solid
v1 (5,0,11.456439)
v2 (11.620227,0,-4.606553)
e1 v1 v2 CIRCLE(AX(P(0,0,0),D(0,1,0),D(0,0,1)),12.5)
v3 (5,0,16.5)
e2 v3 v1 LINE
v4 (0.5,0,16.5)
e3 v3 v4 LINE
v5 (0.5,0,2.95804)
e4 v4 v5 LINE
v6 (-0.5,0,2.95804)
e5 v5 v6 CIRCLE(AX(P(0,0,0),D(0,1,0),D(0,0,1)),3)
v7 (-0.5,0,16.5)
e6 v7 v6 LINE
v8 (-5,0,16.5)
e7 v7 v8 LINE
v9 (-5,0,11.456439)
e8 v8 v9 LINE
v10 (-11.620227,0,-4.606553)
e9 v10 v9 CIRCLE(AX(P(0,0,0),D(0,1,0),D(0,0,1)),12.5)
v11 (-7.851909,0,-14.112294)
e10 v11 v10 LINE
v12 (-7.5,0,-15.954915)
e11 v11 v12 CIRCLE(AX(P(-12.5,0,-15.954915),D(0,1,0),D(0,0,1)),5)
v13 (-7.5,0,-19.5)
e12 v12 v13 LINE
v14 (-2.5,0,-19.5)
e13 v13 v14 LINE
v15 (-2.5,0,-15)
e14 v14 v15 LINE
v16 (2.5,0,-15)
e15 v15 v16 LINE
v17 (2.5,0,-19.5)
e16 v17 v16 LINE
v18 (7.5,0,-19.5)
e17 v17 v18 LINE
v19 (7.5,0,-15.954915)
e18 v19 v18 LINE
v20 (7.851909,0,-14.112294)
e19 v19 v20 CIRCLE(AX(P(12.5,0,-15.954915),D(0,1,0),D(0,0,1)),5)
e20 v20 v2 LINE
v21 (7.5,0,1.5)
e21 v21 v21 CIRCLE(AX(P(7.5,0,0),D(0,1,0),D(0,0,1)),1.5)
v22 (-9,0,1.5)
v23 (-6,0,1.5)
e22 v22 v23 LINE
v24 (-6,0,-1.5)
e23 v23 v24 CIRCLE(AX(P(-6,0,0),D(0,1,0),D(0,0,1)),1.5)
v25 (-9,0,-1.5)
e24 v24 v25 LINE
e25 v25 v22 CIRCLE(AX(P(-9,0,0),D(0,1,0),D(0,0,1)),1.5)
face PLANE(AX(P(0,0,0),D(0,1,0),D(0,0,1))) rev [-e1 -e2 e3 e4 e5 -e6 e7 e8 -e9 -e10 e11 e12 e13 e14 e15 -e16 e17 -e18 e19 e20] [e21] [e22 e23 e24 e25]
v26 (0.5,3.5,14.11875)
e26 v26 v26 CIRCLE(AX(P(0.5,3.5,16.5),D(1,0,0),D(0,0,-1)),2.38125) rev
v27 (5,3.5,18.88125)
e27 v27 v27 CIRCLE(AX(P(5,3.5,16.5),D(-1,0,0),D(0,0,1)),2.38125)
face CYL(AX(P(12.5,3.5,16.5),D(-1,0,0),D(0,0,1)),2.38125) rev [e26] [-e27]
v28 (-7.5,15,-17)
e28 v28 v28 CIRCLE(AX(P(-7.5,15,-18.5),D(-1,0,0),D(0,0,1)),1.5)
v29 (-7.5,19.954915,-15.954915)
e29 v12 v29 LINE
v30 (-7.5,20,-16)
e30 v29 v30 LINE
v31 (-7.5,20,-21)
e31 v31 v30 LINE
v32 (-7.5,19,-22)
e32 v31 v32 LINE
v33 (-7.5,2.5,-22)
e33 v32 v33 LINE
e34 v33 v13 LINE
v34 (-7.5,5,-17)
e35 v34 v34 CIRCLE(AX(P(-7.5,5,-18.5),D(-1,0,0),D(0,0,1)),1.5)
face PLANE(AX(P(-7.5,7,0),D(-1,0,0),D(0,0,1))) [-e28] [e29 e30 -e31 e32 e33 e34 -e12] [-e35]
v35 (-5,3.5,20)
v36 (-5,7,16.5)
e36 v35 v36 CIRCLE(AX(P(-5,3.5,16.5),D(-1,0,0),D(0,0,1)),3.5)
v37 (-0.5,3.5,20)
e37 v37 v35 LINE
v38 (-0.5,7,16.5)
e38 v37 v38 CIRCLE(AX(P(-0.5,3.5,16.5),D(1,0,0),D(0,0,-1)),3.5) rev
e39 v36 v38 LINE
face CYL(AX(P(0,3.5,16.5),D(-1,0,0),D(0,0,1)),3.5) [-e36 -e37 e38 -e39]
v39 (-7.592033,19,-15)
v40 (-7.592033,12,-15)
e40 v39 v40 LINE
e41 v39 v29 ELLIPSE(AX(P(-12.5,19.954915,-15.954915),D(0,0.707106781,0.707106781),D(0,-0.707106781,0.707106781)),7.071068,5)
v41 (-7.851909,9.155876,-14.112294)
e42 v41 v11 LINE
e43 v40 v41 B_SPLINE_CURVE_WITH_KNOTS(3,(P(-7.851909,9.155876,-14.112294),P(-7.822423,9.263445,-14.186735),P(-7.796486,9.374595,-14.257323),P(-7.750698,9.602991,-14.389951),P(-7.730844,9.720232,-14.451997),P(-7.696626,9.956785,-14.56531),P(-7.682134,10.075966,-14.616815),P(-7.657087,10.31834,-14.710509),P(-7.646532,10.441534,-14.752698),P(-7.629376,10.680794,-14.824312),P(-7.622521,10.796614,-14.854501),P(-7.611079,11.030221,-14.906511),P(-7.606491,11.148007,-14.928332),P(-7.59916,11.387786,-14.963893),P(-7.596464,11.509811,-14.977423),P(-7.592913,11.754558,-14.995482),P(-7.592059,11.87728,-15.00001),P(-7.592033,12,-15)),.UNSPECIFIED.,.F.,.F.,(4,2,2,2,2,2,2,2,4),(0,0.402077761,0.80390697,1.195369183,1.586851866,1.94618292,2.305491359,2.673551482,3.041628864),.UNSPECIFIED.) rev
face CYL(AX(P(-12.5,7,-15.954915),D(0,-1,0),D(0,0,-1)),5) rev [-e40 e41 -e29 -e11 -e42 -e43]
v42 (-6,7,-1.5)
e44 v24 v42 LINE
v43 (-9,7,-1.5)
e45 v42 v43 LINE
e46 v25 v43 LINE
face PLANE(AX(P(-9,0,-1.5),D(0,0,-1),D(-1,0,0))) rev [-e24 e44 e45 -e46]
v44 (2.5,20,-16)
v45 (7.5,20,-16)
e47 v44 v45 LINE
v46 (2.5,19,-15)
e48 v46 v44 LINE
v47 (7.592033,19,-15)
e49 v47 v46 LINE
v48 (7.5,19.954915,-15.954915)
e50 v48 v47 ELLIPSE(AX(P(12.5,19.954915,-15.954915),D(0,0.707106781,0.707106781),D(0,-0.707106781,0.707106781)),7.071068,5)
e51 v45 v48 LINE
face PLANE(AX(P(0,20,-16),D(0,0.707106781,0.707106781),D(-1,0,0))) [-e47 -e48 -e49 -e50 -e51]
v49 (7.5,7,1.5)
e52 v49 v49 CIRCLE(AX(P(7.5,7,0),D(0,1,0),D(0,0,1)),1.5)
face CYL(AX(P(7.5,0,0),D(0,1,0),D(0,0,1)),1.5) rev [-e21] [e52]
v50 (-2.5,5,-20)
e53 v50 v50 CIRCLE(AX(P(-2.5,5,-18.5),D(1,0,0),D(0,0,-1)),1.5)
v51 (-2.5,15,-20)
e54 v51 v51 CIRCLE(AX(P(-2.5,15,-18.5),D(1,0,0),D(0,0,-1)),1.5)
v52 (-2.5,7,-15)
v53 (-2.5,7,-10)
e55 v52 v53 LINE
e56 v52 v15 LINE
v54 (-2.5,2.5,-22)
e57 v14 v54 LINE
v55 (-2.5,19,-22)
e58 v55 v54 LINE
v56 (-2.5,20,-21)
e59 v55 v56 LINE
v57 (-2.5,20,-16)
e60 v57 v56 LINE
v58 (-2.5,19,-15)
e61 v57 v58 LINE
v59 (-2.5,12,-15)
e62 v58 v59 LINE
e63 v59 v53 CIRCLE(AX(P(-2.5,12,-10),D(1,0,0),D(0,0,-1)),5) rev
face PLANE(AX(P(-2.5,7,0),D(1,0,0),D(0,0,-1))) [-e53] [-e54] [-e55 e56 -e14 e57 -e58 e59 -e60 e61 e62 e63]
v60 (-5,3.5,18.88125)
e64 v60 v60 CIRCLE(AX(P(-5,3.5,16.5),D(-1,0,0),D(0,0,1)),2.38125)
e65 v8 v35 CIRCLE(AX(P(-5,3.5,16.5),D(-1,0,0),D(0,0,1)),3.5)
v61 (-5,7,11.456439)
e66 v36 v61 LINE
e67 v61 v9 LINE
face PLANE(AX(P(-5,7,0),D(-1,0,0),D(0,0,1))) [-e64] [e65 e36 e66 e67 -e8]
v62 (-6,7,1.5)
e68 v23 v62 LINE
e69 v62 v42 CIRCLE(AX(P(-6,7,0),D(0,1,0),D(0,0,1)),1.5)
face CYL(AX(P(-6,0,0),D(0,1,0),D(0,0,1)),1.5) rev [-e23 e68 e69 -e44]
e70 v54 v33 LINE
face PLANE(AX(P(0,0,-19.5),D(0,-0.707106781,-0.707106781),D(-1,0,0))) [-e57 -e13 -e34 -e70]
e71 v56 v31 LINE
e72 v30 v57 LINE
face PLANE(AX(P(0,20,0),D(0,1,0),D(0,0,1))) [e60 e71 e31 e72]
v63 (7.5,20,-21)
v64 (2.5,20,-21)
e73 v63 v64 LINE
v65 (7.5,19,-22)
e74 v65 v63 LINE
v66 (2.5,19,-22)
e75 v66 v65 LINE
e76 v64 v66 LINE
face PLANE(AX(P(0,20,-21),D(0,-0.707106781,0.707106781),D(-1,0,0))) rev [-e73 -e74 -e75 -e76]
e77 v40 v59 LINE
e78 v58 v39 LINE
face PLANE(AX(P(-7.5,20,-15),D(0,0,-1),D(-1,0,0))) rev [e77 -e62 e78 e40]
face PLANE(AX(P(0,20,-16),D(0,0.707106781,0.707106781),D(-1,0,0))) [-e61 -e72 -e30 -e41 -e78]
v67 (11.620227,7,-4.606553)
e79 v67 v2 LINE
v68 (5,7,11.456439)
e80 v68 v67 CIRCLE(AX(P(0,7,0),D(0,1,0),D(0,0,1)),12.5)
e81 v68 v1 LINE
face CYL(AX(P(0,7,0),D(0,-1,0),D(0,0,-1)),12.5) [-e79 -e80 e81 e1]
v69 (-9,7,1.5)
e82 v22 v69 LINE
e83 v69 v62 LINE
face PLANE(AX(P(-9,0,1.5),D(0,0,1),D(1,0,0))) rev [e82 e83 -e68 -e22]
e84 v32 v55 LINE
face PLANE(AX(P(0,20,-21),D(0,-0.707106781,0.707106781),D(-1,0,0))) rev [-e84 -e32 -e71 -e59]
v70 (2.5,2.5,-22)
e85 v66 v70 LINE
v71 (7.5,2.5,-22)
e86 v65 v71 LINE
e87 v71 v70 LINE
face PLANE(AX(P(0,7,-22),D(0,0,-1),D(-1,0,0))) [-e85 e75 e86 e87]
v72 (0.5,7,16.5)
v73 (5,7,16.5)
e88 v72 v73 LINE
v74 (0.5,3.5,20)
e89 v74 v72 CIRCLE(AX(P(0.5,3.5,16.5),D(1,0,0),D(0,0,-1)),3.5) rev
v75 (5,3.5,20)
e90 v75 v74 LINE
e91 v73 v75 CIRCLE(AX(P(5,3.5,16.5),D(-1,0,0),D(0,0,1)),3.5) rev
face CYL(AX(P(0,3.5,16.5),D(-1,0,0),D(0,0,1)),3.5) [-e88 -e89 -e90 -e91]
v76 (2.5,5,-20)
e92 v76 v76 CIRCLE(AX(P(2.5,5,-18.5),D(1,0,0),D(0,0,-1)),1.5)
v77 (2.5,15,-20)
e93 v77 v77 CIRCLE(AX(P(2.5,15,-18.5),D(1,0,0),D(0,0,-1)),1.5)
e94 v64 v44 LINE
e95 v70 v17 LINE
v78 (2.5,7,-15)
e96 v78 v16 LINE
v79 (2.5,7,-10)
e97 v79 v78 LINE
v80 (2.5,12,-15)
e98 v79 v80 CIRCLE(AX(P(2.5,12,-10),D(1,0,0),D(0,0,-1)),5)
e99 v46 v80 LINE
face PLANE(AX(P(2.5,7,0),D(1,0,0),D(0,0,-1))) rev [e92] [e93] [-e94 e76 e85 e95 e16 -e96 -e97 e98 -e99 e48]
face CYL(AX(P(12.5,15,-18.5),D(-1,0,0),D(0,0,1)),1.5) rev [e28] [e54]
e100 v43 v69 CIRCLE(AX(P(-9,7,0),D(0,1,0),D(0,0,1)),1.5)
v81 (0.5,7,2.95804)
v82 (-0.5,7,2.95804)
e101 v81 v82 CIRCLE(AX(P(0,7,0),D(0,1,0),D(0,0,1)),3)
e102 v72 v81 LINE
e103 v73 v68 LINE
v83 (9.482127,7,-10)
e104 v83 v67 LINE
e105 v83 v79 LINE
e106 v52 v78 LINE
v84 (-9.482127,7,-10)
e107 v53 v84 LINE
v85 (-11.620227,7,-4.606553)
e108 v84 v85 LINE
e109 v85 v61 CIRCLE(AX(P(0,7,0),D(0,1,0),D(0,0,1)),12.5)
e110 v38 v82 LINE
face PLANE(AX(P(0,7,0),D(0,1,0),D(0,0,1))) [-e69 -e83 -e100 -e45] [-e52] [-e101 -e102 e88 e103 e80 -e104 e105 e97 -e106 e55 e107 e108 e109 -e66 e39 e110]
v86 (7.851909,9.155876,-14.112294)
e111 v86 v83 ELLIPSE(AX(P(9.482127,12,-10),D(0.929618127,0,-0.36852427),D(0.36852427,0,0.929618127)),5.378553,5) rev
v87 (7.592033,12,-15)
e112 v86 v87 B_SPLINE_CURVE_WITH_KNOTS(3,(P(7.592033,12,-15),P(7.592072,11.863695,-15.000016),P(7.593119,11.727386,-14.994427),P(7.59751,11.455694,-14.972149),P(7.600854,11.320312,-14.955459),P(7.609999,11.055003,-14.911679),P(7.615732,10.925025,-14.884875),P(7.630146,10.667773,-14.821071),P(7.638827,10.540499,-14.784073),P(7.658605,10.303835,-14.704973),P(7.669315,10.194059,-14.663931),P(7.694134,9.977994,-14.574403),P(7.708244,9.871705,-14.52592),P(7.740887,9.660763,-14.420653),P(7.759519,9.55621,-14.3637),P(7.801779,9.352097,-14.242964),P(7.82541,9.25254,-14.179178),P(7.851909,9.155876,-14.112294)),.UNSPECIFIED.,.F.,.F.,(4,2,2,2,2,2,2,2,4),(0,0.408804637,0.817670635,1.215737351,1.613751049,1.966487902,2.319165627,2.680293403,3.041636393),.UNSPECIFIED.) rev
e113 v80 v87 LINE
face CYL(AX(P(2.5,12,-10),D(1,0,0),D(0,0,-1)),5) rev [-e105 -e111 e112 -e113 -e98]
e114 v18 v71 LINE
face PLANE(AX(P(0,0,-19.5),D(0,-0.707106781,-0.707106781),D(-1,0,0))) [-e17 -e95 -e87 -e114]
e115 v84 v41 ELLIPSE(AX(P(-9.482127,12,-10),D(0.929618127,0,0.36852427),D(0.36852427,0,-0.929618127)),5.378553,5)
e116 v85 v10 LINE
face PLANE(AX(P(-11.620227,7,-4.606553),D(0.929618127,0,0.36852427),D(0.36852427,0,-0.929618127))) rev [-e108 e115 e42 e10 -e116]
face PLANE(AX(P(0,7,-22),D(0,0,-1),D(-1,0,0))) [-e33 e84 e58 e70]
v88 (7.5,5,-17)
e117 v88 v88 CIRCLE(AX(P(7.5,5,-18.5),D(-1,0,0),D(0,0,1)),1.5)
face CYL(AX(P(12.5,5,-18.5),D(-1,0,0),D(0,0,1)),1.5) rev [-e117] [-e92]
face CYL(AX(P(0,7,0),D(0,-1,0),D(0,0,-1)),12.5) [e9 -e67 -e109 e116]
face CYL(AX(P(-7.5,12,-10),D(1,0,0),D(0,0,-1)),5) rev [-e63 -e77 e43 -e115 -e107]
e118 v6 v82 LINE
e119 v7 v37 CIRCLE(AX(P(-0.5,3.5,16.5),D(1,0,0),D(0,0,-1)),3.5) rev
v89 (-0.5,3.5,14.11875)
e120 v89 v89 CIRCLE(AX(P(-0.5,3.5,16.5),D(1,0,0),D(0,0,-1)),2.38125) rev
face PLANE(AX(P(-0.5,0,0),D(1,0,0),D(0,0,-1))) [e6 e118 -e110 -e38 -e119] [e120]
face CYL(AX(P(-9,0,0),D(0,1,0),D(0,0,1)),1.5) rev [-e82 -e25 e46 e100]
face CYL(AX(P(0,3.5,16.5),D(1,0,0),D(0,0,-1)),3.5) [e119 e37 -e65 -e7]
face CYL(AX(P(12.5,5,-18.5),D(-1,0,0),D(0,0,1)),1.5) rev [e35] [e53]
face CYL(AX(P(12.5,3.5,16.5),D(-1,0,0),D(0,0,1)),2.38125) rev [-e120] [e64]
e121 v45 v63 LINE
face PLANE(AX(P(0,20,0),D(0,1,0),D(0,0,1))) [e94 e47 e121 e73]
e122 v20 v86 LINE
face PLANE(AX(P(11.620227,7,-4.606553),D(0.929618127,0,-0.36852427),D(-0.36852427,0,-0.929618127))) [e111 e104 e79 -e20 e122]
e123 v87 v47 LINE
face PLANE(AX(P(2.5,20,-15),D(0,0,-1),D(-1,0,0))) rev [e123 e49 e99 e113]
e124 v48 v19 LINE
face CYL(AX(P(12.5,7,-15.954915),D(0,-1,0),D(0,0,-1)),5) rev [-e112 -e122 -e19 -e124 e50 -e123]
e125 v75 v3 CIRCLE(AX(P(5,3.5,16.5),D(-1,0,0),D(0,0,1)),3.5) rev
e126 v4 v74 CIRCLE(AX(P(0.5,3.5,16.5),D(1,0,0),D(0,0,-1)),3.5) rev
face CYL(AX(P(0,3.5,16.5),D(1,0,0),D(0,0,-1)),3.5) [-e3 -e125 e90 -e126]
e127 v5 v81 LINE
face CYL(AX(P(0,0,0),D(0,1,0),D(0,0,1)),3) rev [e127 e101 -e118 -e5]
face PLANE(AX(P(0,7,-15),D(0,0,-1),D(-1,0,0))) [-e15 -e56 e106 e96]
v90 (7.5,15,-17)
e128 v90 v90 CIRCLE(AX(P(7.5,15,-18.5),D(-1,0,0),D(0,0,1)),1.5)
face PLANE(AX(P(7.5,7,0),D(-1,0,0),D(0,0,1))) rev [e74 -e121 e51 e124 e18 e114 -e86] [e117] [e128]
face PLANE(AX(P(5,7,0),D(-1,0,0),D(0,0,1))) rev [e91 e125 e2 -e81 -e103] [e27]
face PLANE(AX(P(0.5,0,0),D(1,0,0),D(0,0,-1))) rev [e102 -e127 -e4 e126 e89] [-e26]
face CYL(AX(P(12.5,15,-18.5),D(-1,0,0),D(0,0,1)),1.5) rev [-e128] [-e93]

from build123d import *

# Parameters (mm, degrees)
SKETCH1_W           = 5
SKETCH1_H           = 7
BOSS_EXTRUDE1_DEPTH = 7
SKETCH3_R           = 2.38125
CUT_EXTRUDE2_DEPTH  = 29.969811874
FILLET2_R           = 3.5
SKETCH5_W           = 1
SKETCH5_H           = 8.5
CUT_EXTRUDE4_DEPTH  = 27.253571186
SKETCH6_R           = 1.5
CUT_EXTRUDE5_DEPTH  = 27.253571186
SKETCH8_W           = 5
SKETCH8_H           = 7
BOSS_EXTRUDE2_DEPTH = 13
FILLET3_DEPTH       = 20
FILLET3_2_DEPTH     = 8.22694
FILLET3_START       = -9.48212727
FILLET3_3_DEPTH     = 6.98212727
FILLET3_START_2     = 2.5
FILLET3_4_DEPTH     = 6.98212727
FILLET3_START_3     = 7
FILLET3_5_DEPTH     = 13.0000001
CHAMFER1_SIZE       = 2.5
CHAMFER2_SIZE       = 1
SKETCH9_R           = 1.5
CUT_EXTRUDE7_DEPTH  = 36.832945734


with BuildPart() as part:
    # Sketch1 → Boss-Extrude1 (new body)
    with BuildSketch(Plane(origin=(0, 0, 0), x_dir=(1, 0, 0), z_dir=(0, 1, 0))):
        with BuildLine():
            Line((-5, -5), (-5, -11.456439237))
            ThreePointArc((-5, -11.456439237), (0, -12.5), (5, -11.456439237))
            Line((5, -11.456439237), (5, -5))
            Line((5, -5), (-5, -5))
        make_face()
        with BuildLine():
            ThreePointArc((-11.620226592, 4.606553371), (-11.556942324, -4.763096065), (-5, -11.456439237))
            Line((-5, -11.456439237), (-5, -5))
            Line((-5, -5), (5, -5))
            Line((5, -5), (5, -11.456439237))
            ThreePointArc((5, -11.456439237), (10.458250332, -6.846531969), (12.5, 0))
            ThreePointArc((12.5, 0), (12.27808683, 2.344905926), (11.620226592, 4.606553371))
            ThreePointArc((11.620226592, 4.606553371), (0, 12.5), (-11.620226592, 4.606553371))
        make_face()
        with BuildLine():
            Line((-5, -11.456439237), (-5, -20))
            Line((-5, -20), (5, -20))
            Line((5, -20), (5, -11.456439237))
            ThreePointArc((5, -11.456439237), (0, -12.5), (-5, -11.456439237))
        make_face()
        with BuildLine():
            Line((-7.5, 15), (-11.620226592, 4.606553371))
            ThreePointArc((-11.620226592, 4.606553371), (0, 12.5), (11.620226592, 4.606553371))
            Line((11.620226592, 4.606553371), (7.5, 15))
            Line((7.5, 15), (2.5, 15))
            Line((2.5, 15), (-2.5, 15))
            Line((-2.5, 15), (-7.5, 15))
        make_face()
        with Locations((-5, 18.5)):
            Rectangle(SKETCH1_W, SKETCH1_H)
        with Locations((5, 18.5)):
            Rectangle(SKETCH1_W, SKETCH1_H)
    extrude(amount=BOSS_EXTRUDE1_DEPTH)

    # Sketch3 → Cut-Extrude2 (cut, through all)
    with BuildSketch(Plane.ZY.offset(5)):
        with Locations((16.5, 3.5)):
            Circle(SKETCH3_R)
    extrude(amount=-CUT_EXTRUDE2_DEPTH, mode=Mode.SUBTRACT)

    # Fillet2
    fillet2_edges = [part.edges().sort_by_distance(p)[0] for p in [
        (0, 0, 20),
        (0, 7, 20),
    ]]
    fillet(fillet2_edges, radius=FILLET2_R - 0.0001)  # a hair under: the kernel refuses the full size

    # Sketch5 → Cut-Extrude4 (cut, through all)
    with BuildSketch(Plane(origin=(0, 7, 0), x_dir=(1, 0, 0), z_dir=(0, 1, 0))):
        with BuildLine():
            ThreePointArc((3, 0), (-1.936491673, 2.291287847), (-0.5, -2.958039892))
            Line((-0.5, -2.958039892), (-0.5, 0))
            Line((-0.5, 0), (0.5, 0))
            Line((0.5, 0), (0.5, -2.958039892))
            ThreePointArc((0.5, -2.958039892), (2.291287847, -1.936491673), (3, 0))
        make_face()
        with BuildLine():
            Line((-0.5, 0), (-0.5, -2.958039892))
            ThreePointArc((-0.5, -2.958039892), (0, -3), (0.5, -2.958039892))
            Line((0.5, -2.958039892), (0.5, 0))
            Line((0.5, 0), (-0.5, 0))
        make_face()
        with BuildLine():
            Line((-0.5, -2.958039892), (-0.5, -16.5))
            Line((-0.5, -16.5), (0.5, -16.5))
            Line((0.5, -16.5), (0.5, -2.958039892))
            ThreePointArc((0.5, -2.958039892), (0, -3), (-0.5, -2.958039892))
        make_face()
        with Locations((0, -20.75)):
            Rectangle(SKETCH5_W, SKETCH5_H)
    extrude(amount=-CUT_EXTRUDE4_DEPTH, mode=Mode.SUBTRACT)

    # Sketch6 → Cut-Extrude5 (cut, through all)
    with BuildSketch(Plane(origin=(0, 7, 0), x_dir=(1, 0, 0), z_dir=(0, 1, 0))):
        with Locations(Location((7.5, 0, 0), (0, 0, 270))):
            Circle(SKETCH6_R)
        with BuildLine():
            Line((-9, 1.5), (-6, 1.5))
            ThreePointArc((-6, 1.5), (-4.5, 0), (-6, -1.5))
            Line((-6, -1.5), (-9, -1.5))
            ThreePointArc((-9, -1.5), (-10.5, 0), (-9, 1.5))
        make_face()
    extrude(amount=-CUT_EXTRUDE5_DEPTH, mode=Mode.SUBTRACT)

    # Sketch8 → Boss-Extrude2 (add)
    with BuildSketch(Plane(origin=(0, 7, 0), x_dir=(1, 0, 0), z_dir=(0, 1, 0))):
        with Locations((-5, 18.5)):
            Rectangle(SKETCH8_W, SKETCH8_H)
        with Locations((5, 18.5)):
            Rectangle(SKETCH8_W, SKETCH8_H)
    extrude(amount=BOSS_EXTRUDE2_DEPTH)

    # Fillet3: read off the stored shape, not the designer's step
    # Fillet3 outline → Fillet3 (add)
    with BuildSketch(Plane(origin=(0, 0, 0), x_dir=(1, 0, 0), z_dir=(0, 1, 0))):
        with BuildLine():
            Line((7.5, 15), (7.592033284, 15))
            ThreePointArc((7.592033284, 15), (7.523061504, 15.475245132), (7.5, 15.954915028))
            Line((7.5, 15.954915028), (7.5, 15))
        make_face()
        with BuildLine():
            Line((-7.5, 15), (-7.5, 15.954915028))
            ThreePointArc((-7.5, 15.954915028), (-7.523061504, 15.475245132), (-7.592033284, 15))
            Line((-7.592033284, 15), (-7.5, 15))
        make_face()
    extrude(amount=FILLET3_DEPTH)

    # Fillet3 2 outline → Fillet3 2 (add)
    with BuildSketch(Plane(origin=(0, 0, 0), x_dir=(1, 0, 0), z_dir=(0, 1, 0))):
        with BuildLine():
            Line((7.5, 15), (7.851909363, 14.11229368))
            ThreePointArc((7.851909363, 14.11229368), (7.701399823, 14.550124532), (7.592033284, 15))
            Line((7.592033284, 15), (7.5, 15))
        make_face()
        with BuildLine():
            Line((-7.5, 15), (-7.592033284, 15))
            ThreePointArc((-7.592033284, 15), (-7.701399823, 14.550124532), (-7.851909363, 14.11229368))
            Line((-7.851909363, 14.11229368), (-7.5, 15))
        make_face()
    extrude(amount=FILLET3_2_DEPTH)

    # Fillet3 3 outline → Fillet3 3 (add)
    with BuildSketch(Plane.YZ.offset(FILLET3_START)):
        with BuildLine():
            ThreePointArc((12, -15), (8.464466094, -13.535533906), (7, -10))
            Line((7, -10), (7, -15))
            Line((7, -15), (8.22694, -15))
            Line((8.22694, -15), (12, -15))
        make_face()
    extrude(amount=FILLET3_3_DEPTH)

    # Fillet3 4 outline → Fillet3 4 (add)
    with BuildSketch(Plane.YZ.offset(FILLET3_START_2)):
        with BuildLine():
            ThreePointArc((12, -15), (8.464466094, -13.535533906), (7, -10))
            Line((7, -10), (7, -15))
            Line((7, -15), (8.22694, -15))
            Line((8.22694, -15), (12, -15))
        make_face()
    extrude(amount=FILLET3_4_DEPTH)

    # Fillet3 5 outline → Fillet3 5 (cut)
    with BuildSketch(Plane(origin=(0, 0, 0), x_dir=(1, 0, 0), z_dir=(0, 1, 0)).offset(FILLET3_START_3)):
        with BuildLine():
            ThreePointArc((7.592033284, 15), (7.701399823, 14.550124532), (7.851909363, 14.11229368))
            Line((7.851909363, 14.11229368), (9.482127184, 9.999999966))
            Line((9.482127184, 9.999999966), (9.48212727, 15))
            Line((9.48212727, 15), (7.592033284, 15))
        make_face()
        with BuildLine():
            ThreePointArc((-7.851909363, 14.11229368), (-7.701399823, 14.550124532), (-7.592033284, 15))
            Line((-7.592033284, 15), (-9.48212727, 15))
            Line((-9.48212727, 15), (-9.48212727, 10))
            Line((-9.48212727, 10), (-7.851909363, 14.11229368))
        make_face()
    extrude(amount=FILLET3_5_DEPTH, mode=Mode.SUBTRACT)

    # Chamfer1
    chamfer1_edges = [part.edges().sort_by_distance(p)[0] for p in [
        (-5, 0, -22),
        (5, 0, -22),
    ]]
    chamfer(chamfer1_edges, length=CHAMFER1_SIZE)

    # Chamfer2
    chamfer2_edges = [part.edges().sort_by_distance(p)[0] for p in [
        (-5.046016642, 20, -15),
        (5.046016642, 20, -15),
        (5, 20, -22),
        (-5, 20, -22),
    ]]
    chamfer(chamfer2_edges, length=CHAMFER2_SIZE)

    # Sketch9 → Cut-Extrude7 (cut, through all)
    with BuildSketch(Plane.ZY.offset(7.5)):
        with Locations((-18.5, 15)):
            Circle(SKETCH9_R)
        with Locations((-18.5, 5)):
            Circle(SKETCH9_R)
    extrude(amount=-CUT_EXTRUDE7_DEPTH, mode=Mode.SUBTRACT)


solid = part.part
